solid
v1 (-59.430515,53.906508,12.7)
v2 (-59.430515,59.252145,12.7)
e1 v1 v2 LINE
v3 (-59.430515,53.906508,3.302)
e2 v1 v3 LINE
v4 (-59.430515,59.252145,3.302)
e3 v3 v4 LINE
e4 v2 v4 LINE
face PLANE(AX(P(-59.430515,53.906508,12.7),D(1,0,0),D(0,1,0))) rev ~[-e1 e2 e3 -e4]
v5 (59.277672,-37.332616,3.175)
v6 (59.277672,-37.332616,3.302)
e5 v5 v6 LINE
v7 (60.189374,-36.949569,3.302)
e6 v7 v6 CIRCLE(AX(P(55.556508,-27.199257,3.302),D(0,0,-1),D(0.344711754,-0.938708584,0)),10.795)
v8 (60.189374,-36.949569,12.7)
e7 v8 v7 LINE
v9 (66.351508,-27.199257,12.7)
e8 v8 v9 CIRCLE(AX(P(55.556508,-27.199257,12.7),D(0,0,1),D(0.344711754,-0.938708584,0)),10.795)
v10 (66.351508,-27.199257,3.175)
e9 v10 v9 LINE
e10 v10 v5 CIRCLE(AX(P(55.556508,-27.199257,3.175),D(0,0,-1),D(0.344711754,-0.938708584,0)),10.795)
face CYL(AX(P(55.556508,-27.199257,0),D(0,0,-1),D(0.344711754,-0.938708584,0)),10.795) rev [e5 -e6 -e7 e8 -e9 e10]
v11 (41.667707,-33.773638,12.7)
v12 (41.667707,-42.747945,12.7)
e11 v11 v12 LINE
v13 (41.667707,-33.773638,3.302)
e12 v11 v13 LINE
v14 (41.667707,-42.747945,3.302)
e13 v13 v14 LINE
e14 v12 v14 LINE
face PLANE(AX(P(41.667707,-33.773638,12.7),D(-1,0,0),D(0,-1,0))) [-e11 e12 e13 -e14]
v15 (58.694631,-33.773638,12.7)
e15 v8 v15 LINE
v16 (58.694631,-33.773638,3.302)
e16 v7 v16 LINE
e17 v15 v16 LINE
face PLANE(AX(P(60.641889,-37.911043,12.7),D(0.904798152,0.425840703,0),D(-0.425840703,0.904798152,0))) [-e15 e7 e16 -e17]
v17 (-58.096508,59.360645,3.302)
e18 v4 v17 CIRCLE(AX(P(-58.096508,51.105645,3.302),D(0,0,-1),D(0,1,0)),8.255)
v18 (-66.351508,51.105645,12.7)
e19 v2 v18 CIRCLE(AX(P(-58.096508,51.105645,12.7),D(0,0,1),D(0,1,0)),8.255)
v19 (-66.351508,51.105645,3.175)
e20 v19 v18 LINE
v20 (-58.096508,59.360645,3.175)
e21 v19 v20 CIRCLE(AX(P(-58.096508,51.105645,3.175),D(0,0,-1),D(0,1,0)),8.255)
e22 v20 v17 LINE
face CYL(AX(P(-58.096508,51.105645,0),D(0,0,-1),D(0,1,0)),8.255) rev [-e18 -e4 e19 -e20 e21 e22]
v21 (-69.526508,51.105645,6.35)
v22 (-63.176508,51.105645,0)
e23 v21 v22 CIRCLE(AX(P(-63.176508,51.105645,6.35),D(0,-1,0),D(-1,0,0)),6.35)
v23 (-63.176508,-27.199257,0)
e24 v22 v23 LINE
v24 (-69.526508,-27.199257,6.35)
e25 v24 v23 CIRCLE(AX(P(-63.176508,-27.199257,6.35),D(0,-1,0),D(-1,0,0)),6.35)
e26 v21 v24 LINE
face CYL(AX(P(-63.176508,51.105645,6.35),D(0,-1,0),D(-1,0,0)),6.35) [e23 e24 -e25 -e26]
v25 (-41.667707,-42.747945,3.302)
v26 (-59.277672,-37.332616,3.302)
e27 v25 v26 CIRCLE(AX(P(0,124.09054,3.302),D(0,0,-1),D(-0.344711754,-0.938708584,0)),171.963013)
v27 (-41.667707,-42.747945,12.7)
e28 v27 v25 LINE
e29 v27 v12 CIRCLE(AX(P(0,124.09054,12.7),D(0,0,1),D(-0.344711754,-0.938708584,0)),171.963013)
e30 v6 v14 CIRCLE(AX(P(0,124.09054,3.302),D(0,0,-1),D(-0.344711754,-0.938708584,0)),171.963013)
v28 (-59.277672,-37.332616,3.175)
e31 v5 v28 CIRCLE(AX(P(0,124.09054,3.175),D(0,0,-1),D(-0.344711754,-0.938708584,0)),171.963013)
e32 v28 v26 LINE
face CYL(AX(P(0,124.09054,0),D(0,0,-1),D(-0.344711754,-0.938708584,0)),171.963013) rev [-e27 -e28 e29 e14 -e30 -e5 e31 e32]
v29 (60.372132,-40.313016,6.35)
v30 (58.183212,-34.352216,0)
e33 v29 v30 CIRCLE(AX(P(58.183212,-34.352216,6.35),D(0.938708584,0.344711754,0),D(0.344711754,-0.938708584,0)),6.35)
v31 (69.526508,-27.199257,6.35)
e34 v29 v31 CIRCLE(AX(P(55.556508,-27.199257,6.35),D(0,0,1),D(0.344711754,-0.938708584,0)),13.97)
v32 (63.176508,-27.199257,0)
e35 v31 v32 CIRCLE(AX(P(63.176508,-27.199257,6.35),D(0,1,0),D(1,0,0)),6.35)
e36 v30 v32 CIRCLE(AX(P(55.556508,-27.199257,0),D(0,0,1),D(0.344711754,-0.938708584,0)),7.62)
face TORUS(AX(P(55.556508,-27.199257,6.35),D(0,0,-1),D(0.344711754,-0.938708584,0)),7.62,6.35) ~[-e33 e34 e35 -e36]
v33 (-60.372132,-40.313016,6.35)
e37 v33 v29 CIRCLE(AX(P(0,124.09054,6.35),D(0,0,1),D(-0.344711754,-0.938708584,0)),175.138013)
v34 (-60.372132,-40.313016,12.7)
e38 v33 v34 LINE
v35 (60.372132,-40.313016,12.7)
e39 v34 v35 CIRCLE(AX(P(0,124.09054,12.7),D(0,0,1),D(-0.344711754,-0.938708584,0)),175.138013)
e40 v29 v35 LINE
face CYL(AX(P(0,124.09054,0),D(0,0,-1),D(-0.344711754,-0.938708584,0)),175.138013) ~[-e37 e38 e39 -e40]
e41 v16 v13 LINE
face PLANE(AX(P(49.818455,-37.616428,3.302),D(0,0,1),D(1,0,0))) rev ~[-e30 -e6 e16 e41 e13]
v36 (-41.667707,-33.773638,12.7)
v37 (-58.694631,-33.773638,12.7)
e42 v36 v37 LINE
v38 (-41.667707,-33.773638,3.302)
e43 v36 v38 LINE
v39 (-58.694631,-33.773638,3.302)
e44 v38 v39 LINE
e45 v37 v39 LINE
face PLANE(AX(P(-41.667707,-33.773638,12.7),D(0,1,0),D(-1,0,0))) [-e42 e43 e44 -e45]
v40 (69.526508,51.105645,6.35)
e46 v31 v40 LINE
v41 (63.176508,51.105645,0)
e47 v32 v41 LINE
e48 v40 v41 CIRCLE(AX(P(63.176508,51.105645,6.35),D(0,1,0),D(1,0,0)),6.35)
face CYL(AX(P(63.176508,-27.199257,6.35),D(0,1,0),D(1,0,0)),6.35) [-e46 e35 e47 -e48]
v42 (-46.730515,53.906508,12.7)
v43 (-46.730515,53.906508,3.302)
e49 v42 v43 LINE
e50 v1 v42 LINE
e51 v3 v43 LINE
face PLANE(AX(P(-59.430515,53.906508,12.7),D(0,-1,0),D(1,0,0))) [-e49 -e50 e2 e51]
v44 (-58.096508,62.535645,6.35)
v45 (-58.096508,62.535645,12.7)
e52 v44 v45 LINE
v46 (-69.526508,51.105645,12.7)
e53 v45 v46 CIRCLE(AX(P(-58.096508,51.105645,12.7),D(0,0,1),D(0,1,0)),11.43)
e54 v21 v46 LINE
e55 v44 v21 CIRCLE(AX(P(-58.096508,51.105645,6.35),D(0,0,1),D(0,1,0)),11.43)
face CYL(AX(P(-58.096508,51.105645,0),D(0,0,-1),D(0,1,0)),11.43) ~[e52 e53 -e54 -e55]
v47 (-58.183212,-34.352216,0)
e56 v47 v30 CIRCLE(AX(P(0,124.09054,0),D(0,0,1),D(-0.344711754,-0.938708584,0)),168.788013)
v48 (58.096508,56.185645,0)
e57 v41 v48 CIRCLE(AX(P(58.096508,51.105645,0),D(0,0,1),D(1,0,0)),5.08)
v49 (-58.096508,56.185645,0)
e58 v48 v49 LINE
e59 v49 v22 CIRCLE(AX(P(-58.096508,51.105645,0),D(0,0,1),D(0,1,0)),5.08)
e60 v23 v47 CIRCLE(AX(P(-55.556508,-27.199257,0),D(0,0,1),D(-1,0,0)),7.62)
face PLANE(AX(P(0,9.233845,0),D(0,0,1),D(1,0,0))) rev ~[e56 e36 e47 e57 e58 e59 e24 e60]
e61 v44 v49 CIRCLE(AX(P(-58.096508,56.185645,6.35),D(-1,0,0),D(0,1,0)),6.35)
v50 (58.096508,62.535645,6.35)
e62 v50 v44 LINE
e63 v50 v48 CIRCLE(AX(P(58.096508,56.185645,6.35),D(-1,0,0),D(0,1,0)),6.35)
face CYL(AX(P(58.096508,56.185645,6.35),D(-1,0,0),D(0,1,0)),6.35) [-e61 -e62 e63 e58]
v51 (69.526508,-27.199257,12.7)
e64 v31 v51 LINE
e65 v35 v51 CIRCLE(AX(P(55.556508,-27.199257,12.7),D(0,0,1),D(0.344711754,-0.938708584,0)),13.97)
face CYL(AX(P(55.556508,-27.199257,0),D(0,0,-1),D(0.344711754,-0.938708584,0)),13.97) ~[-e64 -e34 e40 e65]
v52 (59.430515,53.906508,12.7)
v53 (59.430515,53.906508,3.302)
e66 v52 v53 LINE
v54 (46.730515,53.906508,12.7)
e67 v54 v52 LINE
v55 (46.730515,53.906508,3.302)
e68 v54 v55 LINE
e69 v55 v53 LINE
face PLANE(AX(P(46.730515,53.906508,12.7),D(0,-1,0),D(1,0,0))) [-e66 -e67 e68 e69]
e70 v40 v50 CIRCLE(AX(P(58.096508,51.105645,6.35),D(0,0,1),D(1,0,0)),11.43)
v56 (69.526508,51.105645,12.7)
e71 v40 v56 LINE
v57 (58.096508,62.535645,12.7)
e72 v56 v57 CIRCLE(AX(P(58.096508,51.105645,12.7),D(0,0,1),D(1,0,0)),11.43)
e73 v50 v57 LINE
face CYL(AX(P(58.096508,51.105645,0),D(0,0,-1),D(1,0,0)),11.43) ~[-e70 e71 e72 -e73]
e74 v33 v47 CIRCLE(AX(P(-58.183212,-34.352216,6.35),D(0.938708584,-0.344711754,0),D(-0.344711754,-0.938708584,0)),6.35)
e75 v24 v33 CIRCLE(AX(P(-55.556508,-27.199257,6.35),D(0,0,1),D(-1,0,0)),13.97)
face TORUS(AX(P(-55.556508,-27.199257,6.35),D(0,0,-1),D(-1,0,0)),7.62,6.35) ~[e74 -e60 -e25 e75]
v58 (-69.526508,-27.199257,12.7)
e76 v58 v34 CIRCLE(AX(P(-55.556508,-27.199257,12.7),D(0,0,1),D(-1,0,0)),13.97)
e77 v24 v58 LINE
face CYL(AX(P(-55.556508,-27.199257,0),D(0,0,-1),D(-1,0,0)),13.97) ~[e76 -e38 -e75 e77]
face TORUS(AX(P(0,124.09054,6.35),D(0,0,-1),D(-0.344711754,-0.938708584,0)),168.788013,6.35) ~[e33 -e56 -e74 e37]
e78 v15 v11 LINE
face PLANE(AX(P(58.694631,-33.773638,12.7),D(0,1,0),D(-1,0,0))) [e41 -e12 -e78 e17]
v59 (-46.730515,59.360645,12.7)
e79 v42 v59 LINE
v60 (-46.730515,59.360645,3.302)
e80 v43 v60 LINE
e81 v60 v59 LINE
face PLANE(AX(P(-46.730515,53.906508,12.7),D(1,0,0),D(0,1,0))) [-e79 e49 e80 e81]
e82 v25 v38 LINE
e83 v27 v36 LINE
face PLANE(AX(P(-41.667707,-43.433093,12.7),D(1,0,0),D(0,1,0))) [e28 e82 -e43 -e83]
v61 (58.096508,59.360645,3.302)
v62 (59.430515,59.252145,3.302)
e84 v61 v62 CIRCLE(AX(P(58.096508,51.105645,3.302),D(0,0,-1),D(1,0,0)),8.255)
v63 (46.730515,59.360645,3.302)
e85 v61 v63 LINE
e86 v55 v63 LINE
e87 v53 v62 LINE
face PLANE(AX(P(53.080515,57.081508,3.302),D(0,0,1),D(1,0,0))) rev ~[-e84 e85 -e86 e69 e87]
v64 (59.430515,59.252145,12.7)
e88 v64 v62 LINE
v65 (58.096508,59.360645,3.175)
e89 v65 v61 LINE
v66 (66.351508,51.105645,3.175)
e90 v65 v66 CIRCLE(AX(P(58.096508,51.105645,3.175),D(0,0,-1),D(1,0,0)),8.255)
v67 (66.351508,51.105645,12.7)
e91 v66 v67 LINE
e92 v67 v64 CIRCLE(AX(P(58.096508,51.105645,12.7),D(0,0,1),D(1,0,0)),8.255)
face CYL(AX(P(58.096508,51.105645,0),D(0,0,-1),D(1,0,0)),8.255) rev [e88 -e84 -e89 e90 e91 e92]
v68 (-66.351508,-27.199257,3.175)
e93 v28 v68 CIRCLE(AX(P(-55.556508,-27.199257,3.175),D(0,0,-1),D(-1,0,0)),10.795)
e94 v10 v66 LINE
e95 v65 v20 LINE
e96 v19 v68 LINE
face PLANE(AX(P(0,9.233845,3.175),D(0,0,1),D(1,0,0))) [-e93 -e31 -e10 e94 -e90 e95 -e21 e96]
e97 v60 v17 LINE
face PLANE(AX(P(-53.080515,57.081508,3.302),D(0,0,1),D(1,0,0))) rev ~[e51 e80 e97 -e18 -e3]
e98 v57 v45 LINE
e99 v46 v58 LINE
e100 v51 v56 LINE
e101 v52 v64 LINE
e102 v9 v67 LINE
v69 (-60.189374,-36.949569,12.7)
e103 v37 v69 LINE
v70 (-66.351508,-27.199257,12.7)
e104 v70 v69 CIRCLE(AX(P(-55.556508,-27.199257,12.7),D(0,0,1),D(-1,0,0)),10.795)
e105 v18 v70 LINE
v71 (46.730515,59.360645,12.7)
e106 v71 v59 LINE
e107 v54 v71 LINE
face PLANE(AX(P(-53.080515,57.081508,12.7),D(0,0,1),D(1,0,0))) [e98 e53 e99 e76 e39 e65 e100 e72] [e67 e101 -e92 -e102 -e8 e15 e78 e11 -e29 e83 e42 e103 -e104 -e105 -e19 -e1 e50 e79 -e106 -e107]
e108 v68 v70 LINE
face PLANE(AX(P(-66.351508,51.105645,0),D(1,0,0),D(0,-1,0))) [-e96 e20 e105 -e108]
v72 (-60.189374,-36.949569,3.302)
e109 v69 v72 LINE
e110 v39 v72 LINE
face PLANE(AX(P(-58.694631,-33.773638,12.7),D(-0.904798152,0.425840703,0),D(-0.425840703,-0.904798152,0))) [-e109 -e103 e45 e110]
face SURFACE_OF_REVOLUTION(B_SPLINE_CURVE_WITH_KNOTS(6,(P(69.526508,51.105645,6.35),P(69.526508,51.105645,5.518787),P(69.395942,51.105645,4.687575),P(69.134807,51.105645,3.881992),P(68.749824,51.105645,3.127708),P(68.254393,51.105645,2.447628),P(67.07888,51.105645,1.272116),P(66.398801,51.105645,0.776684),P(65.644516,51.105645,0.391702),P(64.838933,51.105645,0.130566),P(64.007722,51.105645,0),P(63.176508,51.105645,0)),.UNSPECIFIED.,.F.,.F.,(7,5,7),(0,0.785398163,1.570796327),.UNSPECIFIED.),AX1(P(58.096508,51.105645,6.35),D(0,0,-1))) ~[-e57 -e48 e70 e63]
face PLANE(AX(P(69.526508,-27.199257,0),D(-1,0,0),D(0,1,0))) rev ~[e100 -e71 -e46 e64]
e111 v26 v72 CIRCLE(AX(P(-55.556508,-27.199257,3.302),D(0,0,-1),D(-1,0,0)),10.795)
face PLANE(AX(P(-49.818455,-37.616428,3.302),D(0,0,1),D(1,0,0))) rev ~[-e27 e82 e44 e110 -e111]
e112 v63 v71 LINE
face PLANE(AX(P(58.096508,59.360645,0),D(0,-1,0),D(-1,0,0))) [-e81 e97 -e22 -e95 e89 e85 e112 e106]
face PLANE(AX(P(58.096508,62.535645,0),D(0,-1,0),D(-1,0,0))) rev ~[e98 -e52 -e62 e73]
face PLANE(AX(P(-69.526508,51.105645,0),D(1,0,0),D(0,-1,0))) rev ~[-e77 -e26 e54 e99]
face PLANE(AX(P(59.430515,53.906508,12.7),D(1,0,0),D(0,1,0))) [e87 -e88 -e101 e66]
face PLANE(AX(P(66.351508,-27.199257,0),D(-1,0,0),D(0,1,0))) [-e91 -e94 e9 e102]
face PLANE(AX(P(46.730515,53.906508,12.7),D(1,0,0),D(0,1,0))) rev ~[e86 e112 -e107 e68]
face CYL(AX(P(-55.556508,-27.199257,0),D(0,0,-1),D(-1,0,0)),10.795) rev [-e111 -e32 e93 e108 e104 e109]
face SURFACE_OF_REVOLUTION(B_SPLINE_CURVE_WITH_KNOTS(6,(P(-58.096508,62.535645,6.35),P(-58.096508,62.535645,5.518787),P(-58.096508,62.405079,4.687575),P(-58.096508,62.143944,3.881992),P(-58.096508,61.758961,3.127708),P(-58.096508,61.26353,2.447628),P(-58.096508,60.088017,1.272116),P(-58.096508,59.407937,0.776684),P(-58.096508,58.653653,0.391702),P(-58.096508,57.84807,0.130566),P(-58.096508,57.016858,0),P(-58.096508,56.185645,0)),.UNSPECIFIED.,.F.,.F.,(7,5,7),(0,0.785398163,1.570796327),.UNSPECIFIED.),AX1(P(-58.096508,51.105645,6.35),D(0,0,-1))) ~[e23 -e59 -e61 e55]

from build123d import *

# Parameters (mm, degrees)
F1_DEPTH = 12.7
F2_T     = -3.175
F3_R     = 6.35
F5_W     = 12.7
F5_H     = 6.35
F6_DEPTH = 9.398


# Not quite as in the source:
# - a feature names something its author has since deleted; it is built from what else it names


with BuildPart() as f1:
    # F0 (on Top) → F1 (new body)
    with BuildSketch(Plane.XY):
        with BuildLine():
            Line((58.0965084505, 62.5356453779), (-58.0965084505, 62.5356453779))
            ThreePointArc((-58.0965084505, 62.5356453779), (-66.1787389595, 59.1878758868), (-69.5265084505, 51.1056453779))
            Line((-69.5265084505, 51.1056453779), (-69.5265084505, -27.1992570698))
            ThreePointArc((-69.5265084505, -27.1992570698), (-67.0115325937, -35.1957139026), (-60.3721316603, -40.3130159932))
            ThreePointArc((-60.3721316603, -40.3130159932), (0, -51.0474727306), (60.3721316603, -40.3130159932))
            ThreePointArc((60.3721316603, -40.3130159932), (67.0115325937, -35.1957139026), (69.5265084505, -27.1992570698))
            Line((69.5265084505, -27.1992570698), (69.5265084505, 51.1056453779))
            ThreePointArc((69.5265084505, 51.1056453779), (66.1787389595, 59.1878758868), (58.0965084505, 62.5356453779))
        make_face()
    extrude(amount=F1_DEPTH)

    # F2
    f2_openings = [f1.faces().sort_by_distance(p)[0] for p in [
        (0, 7.919531, 12.7),
    ]]
    offset(amount=F2_T, openings=f2_openings)

    # F3
    f3_edges = [f1.edges().sort_by_distance(p)[0] for p in [
        (69.526508, 11.953194, 0),
        (66.178739, 59.187876, 0),
        (0, 62.535645, 0),
        (-66.178739, 59.187876, 0),
        (-69.526508, 11.953194, 0),
        (-67.011533, -35.195714, 0),
        (0, -51.047473, 0),
        (67.011533, -35.195714, 0),
    ]]
    fillet(f3_edges, radius=F3_R)

    # F5 (on offset) → F6 (join)
    with BuildSketch(Plane.XY.offset(12.7)):
        with Locations((-53.0805146158, 57.0815077901)):
            Rectangle(F5_W, F5_H)
        with Locations((53.0805146158, 57.0815077901)):
            Rectangle(F5_W, F5_H)
        Polygon((-41.6677072644, -33.773638308), (-58.6946308613, -33.773638308), (-60.6418885291, -37.9110425711), (-53.9016760886, -40.266495198), (-41.6677072644, -43.4330925345), align=None)
        Polygon((60.6418885291, -37.9110425711), (58.6946308613, -33.773638308), (41.6677072644, -33.773638308), (41.6677072644, -43.4330925345), (53.9016760886, -40.266495198), align=None)
    extrude(amount=-F6_DEPTH)


solid = f1.part
